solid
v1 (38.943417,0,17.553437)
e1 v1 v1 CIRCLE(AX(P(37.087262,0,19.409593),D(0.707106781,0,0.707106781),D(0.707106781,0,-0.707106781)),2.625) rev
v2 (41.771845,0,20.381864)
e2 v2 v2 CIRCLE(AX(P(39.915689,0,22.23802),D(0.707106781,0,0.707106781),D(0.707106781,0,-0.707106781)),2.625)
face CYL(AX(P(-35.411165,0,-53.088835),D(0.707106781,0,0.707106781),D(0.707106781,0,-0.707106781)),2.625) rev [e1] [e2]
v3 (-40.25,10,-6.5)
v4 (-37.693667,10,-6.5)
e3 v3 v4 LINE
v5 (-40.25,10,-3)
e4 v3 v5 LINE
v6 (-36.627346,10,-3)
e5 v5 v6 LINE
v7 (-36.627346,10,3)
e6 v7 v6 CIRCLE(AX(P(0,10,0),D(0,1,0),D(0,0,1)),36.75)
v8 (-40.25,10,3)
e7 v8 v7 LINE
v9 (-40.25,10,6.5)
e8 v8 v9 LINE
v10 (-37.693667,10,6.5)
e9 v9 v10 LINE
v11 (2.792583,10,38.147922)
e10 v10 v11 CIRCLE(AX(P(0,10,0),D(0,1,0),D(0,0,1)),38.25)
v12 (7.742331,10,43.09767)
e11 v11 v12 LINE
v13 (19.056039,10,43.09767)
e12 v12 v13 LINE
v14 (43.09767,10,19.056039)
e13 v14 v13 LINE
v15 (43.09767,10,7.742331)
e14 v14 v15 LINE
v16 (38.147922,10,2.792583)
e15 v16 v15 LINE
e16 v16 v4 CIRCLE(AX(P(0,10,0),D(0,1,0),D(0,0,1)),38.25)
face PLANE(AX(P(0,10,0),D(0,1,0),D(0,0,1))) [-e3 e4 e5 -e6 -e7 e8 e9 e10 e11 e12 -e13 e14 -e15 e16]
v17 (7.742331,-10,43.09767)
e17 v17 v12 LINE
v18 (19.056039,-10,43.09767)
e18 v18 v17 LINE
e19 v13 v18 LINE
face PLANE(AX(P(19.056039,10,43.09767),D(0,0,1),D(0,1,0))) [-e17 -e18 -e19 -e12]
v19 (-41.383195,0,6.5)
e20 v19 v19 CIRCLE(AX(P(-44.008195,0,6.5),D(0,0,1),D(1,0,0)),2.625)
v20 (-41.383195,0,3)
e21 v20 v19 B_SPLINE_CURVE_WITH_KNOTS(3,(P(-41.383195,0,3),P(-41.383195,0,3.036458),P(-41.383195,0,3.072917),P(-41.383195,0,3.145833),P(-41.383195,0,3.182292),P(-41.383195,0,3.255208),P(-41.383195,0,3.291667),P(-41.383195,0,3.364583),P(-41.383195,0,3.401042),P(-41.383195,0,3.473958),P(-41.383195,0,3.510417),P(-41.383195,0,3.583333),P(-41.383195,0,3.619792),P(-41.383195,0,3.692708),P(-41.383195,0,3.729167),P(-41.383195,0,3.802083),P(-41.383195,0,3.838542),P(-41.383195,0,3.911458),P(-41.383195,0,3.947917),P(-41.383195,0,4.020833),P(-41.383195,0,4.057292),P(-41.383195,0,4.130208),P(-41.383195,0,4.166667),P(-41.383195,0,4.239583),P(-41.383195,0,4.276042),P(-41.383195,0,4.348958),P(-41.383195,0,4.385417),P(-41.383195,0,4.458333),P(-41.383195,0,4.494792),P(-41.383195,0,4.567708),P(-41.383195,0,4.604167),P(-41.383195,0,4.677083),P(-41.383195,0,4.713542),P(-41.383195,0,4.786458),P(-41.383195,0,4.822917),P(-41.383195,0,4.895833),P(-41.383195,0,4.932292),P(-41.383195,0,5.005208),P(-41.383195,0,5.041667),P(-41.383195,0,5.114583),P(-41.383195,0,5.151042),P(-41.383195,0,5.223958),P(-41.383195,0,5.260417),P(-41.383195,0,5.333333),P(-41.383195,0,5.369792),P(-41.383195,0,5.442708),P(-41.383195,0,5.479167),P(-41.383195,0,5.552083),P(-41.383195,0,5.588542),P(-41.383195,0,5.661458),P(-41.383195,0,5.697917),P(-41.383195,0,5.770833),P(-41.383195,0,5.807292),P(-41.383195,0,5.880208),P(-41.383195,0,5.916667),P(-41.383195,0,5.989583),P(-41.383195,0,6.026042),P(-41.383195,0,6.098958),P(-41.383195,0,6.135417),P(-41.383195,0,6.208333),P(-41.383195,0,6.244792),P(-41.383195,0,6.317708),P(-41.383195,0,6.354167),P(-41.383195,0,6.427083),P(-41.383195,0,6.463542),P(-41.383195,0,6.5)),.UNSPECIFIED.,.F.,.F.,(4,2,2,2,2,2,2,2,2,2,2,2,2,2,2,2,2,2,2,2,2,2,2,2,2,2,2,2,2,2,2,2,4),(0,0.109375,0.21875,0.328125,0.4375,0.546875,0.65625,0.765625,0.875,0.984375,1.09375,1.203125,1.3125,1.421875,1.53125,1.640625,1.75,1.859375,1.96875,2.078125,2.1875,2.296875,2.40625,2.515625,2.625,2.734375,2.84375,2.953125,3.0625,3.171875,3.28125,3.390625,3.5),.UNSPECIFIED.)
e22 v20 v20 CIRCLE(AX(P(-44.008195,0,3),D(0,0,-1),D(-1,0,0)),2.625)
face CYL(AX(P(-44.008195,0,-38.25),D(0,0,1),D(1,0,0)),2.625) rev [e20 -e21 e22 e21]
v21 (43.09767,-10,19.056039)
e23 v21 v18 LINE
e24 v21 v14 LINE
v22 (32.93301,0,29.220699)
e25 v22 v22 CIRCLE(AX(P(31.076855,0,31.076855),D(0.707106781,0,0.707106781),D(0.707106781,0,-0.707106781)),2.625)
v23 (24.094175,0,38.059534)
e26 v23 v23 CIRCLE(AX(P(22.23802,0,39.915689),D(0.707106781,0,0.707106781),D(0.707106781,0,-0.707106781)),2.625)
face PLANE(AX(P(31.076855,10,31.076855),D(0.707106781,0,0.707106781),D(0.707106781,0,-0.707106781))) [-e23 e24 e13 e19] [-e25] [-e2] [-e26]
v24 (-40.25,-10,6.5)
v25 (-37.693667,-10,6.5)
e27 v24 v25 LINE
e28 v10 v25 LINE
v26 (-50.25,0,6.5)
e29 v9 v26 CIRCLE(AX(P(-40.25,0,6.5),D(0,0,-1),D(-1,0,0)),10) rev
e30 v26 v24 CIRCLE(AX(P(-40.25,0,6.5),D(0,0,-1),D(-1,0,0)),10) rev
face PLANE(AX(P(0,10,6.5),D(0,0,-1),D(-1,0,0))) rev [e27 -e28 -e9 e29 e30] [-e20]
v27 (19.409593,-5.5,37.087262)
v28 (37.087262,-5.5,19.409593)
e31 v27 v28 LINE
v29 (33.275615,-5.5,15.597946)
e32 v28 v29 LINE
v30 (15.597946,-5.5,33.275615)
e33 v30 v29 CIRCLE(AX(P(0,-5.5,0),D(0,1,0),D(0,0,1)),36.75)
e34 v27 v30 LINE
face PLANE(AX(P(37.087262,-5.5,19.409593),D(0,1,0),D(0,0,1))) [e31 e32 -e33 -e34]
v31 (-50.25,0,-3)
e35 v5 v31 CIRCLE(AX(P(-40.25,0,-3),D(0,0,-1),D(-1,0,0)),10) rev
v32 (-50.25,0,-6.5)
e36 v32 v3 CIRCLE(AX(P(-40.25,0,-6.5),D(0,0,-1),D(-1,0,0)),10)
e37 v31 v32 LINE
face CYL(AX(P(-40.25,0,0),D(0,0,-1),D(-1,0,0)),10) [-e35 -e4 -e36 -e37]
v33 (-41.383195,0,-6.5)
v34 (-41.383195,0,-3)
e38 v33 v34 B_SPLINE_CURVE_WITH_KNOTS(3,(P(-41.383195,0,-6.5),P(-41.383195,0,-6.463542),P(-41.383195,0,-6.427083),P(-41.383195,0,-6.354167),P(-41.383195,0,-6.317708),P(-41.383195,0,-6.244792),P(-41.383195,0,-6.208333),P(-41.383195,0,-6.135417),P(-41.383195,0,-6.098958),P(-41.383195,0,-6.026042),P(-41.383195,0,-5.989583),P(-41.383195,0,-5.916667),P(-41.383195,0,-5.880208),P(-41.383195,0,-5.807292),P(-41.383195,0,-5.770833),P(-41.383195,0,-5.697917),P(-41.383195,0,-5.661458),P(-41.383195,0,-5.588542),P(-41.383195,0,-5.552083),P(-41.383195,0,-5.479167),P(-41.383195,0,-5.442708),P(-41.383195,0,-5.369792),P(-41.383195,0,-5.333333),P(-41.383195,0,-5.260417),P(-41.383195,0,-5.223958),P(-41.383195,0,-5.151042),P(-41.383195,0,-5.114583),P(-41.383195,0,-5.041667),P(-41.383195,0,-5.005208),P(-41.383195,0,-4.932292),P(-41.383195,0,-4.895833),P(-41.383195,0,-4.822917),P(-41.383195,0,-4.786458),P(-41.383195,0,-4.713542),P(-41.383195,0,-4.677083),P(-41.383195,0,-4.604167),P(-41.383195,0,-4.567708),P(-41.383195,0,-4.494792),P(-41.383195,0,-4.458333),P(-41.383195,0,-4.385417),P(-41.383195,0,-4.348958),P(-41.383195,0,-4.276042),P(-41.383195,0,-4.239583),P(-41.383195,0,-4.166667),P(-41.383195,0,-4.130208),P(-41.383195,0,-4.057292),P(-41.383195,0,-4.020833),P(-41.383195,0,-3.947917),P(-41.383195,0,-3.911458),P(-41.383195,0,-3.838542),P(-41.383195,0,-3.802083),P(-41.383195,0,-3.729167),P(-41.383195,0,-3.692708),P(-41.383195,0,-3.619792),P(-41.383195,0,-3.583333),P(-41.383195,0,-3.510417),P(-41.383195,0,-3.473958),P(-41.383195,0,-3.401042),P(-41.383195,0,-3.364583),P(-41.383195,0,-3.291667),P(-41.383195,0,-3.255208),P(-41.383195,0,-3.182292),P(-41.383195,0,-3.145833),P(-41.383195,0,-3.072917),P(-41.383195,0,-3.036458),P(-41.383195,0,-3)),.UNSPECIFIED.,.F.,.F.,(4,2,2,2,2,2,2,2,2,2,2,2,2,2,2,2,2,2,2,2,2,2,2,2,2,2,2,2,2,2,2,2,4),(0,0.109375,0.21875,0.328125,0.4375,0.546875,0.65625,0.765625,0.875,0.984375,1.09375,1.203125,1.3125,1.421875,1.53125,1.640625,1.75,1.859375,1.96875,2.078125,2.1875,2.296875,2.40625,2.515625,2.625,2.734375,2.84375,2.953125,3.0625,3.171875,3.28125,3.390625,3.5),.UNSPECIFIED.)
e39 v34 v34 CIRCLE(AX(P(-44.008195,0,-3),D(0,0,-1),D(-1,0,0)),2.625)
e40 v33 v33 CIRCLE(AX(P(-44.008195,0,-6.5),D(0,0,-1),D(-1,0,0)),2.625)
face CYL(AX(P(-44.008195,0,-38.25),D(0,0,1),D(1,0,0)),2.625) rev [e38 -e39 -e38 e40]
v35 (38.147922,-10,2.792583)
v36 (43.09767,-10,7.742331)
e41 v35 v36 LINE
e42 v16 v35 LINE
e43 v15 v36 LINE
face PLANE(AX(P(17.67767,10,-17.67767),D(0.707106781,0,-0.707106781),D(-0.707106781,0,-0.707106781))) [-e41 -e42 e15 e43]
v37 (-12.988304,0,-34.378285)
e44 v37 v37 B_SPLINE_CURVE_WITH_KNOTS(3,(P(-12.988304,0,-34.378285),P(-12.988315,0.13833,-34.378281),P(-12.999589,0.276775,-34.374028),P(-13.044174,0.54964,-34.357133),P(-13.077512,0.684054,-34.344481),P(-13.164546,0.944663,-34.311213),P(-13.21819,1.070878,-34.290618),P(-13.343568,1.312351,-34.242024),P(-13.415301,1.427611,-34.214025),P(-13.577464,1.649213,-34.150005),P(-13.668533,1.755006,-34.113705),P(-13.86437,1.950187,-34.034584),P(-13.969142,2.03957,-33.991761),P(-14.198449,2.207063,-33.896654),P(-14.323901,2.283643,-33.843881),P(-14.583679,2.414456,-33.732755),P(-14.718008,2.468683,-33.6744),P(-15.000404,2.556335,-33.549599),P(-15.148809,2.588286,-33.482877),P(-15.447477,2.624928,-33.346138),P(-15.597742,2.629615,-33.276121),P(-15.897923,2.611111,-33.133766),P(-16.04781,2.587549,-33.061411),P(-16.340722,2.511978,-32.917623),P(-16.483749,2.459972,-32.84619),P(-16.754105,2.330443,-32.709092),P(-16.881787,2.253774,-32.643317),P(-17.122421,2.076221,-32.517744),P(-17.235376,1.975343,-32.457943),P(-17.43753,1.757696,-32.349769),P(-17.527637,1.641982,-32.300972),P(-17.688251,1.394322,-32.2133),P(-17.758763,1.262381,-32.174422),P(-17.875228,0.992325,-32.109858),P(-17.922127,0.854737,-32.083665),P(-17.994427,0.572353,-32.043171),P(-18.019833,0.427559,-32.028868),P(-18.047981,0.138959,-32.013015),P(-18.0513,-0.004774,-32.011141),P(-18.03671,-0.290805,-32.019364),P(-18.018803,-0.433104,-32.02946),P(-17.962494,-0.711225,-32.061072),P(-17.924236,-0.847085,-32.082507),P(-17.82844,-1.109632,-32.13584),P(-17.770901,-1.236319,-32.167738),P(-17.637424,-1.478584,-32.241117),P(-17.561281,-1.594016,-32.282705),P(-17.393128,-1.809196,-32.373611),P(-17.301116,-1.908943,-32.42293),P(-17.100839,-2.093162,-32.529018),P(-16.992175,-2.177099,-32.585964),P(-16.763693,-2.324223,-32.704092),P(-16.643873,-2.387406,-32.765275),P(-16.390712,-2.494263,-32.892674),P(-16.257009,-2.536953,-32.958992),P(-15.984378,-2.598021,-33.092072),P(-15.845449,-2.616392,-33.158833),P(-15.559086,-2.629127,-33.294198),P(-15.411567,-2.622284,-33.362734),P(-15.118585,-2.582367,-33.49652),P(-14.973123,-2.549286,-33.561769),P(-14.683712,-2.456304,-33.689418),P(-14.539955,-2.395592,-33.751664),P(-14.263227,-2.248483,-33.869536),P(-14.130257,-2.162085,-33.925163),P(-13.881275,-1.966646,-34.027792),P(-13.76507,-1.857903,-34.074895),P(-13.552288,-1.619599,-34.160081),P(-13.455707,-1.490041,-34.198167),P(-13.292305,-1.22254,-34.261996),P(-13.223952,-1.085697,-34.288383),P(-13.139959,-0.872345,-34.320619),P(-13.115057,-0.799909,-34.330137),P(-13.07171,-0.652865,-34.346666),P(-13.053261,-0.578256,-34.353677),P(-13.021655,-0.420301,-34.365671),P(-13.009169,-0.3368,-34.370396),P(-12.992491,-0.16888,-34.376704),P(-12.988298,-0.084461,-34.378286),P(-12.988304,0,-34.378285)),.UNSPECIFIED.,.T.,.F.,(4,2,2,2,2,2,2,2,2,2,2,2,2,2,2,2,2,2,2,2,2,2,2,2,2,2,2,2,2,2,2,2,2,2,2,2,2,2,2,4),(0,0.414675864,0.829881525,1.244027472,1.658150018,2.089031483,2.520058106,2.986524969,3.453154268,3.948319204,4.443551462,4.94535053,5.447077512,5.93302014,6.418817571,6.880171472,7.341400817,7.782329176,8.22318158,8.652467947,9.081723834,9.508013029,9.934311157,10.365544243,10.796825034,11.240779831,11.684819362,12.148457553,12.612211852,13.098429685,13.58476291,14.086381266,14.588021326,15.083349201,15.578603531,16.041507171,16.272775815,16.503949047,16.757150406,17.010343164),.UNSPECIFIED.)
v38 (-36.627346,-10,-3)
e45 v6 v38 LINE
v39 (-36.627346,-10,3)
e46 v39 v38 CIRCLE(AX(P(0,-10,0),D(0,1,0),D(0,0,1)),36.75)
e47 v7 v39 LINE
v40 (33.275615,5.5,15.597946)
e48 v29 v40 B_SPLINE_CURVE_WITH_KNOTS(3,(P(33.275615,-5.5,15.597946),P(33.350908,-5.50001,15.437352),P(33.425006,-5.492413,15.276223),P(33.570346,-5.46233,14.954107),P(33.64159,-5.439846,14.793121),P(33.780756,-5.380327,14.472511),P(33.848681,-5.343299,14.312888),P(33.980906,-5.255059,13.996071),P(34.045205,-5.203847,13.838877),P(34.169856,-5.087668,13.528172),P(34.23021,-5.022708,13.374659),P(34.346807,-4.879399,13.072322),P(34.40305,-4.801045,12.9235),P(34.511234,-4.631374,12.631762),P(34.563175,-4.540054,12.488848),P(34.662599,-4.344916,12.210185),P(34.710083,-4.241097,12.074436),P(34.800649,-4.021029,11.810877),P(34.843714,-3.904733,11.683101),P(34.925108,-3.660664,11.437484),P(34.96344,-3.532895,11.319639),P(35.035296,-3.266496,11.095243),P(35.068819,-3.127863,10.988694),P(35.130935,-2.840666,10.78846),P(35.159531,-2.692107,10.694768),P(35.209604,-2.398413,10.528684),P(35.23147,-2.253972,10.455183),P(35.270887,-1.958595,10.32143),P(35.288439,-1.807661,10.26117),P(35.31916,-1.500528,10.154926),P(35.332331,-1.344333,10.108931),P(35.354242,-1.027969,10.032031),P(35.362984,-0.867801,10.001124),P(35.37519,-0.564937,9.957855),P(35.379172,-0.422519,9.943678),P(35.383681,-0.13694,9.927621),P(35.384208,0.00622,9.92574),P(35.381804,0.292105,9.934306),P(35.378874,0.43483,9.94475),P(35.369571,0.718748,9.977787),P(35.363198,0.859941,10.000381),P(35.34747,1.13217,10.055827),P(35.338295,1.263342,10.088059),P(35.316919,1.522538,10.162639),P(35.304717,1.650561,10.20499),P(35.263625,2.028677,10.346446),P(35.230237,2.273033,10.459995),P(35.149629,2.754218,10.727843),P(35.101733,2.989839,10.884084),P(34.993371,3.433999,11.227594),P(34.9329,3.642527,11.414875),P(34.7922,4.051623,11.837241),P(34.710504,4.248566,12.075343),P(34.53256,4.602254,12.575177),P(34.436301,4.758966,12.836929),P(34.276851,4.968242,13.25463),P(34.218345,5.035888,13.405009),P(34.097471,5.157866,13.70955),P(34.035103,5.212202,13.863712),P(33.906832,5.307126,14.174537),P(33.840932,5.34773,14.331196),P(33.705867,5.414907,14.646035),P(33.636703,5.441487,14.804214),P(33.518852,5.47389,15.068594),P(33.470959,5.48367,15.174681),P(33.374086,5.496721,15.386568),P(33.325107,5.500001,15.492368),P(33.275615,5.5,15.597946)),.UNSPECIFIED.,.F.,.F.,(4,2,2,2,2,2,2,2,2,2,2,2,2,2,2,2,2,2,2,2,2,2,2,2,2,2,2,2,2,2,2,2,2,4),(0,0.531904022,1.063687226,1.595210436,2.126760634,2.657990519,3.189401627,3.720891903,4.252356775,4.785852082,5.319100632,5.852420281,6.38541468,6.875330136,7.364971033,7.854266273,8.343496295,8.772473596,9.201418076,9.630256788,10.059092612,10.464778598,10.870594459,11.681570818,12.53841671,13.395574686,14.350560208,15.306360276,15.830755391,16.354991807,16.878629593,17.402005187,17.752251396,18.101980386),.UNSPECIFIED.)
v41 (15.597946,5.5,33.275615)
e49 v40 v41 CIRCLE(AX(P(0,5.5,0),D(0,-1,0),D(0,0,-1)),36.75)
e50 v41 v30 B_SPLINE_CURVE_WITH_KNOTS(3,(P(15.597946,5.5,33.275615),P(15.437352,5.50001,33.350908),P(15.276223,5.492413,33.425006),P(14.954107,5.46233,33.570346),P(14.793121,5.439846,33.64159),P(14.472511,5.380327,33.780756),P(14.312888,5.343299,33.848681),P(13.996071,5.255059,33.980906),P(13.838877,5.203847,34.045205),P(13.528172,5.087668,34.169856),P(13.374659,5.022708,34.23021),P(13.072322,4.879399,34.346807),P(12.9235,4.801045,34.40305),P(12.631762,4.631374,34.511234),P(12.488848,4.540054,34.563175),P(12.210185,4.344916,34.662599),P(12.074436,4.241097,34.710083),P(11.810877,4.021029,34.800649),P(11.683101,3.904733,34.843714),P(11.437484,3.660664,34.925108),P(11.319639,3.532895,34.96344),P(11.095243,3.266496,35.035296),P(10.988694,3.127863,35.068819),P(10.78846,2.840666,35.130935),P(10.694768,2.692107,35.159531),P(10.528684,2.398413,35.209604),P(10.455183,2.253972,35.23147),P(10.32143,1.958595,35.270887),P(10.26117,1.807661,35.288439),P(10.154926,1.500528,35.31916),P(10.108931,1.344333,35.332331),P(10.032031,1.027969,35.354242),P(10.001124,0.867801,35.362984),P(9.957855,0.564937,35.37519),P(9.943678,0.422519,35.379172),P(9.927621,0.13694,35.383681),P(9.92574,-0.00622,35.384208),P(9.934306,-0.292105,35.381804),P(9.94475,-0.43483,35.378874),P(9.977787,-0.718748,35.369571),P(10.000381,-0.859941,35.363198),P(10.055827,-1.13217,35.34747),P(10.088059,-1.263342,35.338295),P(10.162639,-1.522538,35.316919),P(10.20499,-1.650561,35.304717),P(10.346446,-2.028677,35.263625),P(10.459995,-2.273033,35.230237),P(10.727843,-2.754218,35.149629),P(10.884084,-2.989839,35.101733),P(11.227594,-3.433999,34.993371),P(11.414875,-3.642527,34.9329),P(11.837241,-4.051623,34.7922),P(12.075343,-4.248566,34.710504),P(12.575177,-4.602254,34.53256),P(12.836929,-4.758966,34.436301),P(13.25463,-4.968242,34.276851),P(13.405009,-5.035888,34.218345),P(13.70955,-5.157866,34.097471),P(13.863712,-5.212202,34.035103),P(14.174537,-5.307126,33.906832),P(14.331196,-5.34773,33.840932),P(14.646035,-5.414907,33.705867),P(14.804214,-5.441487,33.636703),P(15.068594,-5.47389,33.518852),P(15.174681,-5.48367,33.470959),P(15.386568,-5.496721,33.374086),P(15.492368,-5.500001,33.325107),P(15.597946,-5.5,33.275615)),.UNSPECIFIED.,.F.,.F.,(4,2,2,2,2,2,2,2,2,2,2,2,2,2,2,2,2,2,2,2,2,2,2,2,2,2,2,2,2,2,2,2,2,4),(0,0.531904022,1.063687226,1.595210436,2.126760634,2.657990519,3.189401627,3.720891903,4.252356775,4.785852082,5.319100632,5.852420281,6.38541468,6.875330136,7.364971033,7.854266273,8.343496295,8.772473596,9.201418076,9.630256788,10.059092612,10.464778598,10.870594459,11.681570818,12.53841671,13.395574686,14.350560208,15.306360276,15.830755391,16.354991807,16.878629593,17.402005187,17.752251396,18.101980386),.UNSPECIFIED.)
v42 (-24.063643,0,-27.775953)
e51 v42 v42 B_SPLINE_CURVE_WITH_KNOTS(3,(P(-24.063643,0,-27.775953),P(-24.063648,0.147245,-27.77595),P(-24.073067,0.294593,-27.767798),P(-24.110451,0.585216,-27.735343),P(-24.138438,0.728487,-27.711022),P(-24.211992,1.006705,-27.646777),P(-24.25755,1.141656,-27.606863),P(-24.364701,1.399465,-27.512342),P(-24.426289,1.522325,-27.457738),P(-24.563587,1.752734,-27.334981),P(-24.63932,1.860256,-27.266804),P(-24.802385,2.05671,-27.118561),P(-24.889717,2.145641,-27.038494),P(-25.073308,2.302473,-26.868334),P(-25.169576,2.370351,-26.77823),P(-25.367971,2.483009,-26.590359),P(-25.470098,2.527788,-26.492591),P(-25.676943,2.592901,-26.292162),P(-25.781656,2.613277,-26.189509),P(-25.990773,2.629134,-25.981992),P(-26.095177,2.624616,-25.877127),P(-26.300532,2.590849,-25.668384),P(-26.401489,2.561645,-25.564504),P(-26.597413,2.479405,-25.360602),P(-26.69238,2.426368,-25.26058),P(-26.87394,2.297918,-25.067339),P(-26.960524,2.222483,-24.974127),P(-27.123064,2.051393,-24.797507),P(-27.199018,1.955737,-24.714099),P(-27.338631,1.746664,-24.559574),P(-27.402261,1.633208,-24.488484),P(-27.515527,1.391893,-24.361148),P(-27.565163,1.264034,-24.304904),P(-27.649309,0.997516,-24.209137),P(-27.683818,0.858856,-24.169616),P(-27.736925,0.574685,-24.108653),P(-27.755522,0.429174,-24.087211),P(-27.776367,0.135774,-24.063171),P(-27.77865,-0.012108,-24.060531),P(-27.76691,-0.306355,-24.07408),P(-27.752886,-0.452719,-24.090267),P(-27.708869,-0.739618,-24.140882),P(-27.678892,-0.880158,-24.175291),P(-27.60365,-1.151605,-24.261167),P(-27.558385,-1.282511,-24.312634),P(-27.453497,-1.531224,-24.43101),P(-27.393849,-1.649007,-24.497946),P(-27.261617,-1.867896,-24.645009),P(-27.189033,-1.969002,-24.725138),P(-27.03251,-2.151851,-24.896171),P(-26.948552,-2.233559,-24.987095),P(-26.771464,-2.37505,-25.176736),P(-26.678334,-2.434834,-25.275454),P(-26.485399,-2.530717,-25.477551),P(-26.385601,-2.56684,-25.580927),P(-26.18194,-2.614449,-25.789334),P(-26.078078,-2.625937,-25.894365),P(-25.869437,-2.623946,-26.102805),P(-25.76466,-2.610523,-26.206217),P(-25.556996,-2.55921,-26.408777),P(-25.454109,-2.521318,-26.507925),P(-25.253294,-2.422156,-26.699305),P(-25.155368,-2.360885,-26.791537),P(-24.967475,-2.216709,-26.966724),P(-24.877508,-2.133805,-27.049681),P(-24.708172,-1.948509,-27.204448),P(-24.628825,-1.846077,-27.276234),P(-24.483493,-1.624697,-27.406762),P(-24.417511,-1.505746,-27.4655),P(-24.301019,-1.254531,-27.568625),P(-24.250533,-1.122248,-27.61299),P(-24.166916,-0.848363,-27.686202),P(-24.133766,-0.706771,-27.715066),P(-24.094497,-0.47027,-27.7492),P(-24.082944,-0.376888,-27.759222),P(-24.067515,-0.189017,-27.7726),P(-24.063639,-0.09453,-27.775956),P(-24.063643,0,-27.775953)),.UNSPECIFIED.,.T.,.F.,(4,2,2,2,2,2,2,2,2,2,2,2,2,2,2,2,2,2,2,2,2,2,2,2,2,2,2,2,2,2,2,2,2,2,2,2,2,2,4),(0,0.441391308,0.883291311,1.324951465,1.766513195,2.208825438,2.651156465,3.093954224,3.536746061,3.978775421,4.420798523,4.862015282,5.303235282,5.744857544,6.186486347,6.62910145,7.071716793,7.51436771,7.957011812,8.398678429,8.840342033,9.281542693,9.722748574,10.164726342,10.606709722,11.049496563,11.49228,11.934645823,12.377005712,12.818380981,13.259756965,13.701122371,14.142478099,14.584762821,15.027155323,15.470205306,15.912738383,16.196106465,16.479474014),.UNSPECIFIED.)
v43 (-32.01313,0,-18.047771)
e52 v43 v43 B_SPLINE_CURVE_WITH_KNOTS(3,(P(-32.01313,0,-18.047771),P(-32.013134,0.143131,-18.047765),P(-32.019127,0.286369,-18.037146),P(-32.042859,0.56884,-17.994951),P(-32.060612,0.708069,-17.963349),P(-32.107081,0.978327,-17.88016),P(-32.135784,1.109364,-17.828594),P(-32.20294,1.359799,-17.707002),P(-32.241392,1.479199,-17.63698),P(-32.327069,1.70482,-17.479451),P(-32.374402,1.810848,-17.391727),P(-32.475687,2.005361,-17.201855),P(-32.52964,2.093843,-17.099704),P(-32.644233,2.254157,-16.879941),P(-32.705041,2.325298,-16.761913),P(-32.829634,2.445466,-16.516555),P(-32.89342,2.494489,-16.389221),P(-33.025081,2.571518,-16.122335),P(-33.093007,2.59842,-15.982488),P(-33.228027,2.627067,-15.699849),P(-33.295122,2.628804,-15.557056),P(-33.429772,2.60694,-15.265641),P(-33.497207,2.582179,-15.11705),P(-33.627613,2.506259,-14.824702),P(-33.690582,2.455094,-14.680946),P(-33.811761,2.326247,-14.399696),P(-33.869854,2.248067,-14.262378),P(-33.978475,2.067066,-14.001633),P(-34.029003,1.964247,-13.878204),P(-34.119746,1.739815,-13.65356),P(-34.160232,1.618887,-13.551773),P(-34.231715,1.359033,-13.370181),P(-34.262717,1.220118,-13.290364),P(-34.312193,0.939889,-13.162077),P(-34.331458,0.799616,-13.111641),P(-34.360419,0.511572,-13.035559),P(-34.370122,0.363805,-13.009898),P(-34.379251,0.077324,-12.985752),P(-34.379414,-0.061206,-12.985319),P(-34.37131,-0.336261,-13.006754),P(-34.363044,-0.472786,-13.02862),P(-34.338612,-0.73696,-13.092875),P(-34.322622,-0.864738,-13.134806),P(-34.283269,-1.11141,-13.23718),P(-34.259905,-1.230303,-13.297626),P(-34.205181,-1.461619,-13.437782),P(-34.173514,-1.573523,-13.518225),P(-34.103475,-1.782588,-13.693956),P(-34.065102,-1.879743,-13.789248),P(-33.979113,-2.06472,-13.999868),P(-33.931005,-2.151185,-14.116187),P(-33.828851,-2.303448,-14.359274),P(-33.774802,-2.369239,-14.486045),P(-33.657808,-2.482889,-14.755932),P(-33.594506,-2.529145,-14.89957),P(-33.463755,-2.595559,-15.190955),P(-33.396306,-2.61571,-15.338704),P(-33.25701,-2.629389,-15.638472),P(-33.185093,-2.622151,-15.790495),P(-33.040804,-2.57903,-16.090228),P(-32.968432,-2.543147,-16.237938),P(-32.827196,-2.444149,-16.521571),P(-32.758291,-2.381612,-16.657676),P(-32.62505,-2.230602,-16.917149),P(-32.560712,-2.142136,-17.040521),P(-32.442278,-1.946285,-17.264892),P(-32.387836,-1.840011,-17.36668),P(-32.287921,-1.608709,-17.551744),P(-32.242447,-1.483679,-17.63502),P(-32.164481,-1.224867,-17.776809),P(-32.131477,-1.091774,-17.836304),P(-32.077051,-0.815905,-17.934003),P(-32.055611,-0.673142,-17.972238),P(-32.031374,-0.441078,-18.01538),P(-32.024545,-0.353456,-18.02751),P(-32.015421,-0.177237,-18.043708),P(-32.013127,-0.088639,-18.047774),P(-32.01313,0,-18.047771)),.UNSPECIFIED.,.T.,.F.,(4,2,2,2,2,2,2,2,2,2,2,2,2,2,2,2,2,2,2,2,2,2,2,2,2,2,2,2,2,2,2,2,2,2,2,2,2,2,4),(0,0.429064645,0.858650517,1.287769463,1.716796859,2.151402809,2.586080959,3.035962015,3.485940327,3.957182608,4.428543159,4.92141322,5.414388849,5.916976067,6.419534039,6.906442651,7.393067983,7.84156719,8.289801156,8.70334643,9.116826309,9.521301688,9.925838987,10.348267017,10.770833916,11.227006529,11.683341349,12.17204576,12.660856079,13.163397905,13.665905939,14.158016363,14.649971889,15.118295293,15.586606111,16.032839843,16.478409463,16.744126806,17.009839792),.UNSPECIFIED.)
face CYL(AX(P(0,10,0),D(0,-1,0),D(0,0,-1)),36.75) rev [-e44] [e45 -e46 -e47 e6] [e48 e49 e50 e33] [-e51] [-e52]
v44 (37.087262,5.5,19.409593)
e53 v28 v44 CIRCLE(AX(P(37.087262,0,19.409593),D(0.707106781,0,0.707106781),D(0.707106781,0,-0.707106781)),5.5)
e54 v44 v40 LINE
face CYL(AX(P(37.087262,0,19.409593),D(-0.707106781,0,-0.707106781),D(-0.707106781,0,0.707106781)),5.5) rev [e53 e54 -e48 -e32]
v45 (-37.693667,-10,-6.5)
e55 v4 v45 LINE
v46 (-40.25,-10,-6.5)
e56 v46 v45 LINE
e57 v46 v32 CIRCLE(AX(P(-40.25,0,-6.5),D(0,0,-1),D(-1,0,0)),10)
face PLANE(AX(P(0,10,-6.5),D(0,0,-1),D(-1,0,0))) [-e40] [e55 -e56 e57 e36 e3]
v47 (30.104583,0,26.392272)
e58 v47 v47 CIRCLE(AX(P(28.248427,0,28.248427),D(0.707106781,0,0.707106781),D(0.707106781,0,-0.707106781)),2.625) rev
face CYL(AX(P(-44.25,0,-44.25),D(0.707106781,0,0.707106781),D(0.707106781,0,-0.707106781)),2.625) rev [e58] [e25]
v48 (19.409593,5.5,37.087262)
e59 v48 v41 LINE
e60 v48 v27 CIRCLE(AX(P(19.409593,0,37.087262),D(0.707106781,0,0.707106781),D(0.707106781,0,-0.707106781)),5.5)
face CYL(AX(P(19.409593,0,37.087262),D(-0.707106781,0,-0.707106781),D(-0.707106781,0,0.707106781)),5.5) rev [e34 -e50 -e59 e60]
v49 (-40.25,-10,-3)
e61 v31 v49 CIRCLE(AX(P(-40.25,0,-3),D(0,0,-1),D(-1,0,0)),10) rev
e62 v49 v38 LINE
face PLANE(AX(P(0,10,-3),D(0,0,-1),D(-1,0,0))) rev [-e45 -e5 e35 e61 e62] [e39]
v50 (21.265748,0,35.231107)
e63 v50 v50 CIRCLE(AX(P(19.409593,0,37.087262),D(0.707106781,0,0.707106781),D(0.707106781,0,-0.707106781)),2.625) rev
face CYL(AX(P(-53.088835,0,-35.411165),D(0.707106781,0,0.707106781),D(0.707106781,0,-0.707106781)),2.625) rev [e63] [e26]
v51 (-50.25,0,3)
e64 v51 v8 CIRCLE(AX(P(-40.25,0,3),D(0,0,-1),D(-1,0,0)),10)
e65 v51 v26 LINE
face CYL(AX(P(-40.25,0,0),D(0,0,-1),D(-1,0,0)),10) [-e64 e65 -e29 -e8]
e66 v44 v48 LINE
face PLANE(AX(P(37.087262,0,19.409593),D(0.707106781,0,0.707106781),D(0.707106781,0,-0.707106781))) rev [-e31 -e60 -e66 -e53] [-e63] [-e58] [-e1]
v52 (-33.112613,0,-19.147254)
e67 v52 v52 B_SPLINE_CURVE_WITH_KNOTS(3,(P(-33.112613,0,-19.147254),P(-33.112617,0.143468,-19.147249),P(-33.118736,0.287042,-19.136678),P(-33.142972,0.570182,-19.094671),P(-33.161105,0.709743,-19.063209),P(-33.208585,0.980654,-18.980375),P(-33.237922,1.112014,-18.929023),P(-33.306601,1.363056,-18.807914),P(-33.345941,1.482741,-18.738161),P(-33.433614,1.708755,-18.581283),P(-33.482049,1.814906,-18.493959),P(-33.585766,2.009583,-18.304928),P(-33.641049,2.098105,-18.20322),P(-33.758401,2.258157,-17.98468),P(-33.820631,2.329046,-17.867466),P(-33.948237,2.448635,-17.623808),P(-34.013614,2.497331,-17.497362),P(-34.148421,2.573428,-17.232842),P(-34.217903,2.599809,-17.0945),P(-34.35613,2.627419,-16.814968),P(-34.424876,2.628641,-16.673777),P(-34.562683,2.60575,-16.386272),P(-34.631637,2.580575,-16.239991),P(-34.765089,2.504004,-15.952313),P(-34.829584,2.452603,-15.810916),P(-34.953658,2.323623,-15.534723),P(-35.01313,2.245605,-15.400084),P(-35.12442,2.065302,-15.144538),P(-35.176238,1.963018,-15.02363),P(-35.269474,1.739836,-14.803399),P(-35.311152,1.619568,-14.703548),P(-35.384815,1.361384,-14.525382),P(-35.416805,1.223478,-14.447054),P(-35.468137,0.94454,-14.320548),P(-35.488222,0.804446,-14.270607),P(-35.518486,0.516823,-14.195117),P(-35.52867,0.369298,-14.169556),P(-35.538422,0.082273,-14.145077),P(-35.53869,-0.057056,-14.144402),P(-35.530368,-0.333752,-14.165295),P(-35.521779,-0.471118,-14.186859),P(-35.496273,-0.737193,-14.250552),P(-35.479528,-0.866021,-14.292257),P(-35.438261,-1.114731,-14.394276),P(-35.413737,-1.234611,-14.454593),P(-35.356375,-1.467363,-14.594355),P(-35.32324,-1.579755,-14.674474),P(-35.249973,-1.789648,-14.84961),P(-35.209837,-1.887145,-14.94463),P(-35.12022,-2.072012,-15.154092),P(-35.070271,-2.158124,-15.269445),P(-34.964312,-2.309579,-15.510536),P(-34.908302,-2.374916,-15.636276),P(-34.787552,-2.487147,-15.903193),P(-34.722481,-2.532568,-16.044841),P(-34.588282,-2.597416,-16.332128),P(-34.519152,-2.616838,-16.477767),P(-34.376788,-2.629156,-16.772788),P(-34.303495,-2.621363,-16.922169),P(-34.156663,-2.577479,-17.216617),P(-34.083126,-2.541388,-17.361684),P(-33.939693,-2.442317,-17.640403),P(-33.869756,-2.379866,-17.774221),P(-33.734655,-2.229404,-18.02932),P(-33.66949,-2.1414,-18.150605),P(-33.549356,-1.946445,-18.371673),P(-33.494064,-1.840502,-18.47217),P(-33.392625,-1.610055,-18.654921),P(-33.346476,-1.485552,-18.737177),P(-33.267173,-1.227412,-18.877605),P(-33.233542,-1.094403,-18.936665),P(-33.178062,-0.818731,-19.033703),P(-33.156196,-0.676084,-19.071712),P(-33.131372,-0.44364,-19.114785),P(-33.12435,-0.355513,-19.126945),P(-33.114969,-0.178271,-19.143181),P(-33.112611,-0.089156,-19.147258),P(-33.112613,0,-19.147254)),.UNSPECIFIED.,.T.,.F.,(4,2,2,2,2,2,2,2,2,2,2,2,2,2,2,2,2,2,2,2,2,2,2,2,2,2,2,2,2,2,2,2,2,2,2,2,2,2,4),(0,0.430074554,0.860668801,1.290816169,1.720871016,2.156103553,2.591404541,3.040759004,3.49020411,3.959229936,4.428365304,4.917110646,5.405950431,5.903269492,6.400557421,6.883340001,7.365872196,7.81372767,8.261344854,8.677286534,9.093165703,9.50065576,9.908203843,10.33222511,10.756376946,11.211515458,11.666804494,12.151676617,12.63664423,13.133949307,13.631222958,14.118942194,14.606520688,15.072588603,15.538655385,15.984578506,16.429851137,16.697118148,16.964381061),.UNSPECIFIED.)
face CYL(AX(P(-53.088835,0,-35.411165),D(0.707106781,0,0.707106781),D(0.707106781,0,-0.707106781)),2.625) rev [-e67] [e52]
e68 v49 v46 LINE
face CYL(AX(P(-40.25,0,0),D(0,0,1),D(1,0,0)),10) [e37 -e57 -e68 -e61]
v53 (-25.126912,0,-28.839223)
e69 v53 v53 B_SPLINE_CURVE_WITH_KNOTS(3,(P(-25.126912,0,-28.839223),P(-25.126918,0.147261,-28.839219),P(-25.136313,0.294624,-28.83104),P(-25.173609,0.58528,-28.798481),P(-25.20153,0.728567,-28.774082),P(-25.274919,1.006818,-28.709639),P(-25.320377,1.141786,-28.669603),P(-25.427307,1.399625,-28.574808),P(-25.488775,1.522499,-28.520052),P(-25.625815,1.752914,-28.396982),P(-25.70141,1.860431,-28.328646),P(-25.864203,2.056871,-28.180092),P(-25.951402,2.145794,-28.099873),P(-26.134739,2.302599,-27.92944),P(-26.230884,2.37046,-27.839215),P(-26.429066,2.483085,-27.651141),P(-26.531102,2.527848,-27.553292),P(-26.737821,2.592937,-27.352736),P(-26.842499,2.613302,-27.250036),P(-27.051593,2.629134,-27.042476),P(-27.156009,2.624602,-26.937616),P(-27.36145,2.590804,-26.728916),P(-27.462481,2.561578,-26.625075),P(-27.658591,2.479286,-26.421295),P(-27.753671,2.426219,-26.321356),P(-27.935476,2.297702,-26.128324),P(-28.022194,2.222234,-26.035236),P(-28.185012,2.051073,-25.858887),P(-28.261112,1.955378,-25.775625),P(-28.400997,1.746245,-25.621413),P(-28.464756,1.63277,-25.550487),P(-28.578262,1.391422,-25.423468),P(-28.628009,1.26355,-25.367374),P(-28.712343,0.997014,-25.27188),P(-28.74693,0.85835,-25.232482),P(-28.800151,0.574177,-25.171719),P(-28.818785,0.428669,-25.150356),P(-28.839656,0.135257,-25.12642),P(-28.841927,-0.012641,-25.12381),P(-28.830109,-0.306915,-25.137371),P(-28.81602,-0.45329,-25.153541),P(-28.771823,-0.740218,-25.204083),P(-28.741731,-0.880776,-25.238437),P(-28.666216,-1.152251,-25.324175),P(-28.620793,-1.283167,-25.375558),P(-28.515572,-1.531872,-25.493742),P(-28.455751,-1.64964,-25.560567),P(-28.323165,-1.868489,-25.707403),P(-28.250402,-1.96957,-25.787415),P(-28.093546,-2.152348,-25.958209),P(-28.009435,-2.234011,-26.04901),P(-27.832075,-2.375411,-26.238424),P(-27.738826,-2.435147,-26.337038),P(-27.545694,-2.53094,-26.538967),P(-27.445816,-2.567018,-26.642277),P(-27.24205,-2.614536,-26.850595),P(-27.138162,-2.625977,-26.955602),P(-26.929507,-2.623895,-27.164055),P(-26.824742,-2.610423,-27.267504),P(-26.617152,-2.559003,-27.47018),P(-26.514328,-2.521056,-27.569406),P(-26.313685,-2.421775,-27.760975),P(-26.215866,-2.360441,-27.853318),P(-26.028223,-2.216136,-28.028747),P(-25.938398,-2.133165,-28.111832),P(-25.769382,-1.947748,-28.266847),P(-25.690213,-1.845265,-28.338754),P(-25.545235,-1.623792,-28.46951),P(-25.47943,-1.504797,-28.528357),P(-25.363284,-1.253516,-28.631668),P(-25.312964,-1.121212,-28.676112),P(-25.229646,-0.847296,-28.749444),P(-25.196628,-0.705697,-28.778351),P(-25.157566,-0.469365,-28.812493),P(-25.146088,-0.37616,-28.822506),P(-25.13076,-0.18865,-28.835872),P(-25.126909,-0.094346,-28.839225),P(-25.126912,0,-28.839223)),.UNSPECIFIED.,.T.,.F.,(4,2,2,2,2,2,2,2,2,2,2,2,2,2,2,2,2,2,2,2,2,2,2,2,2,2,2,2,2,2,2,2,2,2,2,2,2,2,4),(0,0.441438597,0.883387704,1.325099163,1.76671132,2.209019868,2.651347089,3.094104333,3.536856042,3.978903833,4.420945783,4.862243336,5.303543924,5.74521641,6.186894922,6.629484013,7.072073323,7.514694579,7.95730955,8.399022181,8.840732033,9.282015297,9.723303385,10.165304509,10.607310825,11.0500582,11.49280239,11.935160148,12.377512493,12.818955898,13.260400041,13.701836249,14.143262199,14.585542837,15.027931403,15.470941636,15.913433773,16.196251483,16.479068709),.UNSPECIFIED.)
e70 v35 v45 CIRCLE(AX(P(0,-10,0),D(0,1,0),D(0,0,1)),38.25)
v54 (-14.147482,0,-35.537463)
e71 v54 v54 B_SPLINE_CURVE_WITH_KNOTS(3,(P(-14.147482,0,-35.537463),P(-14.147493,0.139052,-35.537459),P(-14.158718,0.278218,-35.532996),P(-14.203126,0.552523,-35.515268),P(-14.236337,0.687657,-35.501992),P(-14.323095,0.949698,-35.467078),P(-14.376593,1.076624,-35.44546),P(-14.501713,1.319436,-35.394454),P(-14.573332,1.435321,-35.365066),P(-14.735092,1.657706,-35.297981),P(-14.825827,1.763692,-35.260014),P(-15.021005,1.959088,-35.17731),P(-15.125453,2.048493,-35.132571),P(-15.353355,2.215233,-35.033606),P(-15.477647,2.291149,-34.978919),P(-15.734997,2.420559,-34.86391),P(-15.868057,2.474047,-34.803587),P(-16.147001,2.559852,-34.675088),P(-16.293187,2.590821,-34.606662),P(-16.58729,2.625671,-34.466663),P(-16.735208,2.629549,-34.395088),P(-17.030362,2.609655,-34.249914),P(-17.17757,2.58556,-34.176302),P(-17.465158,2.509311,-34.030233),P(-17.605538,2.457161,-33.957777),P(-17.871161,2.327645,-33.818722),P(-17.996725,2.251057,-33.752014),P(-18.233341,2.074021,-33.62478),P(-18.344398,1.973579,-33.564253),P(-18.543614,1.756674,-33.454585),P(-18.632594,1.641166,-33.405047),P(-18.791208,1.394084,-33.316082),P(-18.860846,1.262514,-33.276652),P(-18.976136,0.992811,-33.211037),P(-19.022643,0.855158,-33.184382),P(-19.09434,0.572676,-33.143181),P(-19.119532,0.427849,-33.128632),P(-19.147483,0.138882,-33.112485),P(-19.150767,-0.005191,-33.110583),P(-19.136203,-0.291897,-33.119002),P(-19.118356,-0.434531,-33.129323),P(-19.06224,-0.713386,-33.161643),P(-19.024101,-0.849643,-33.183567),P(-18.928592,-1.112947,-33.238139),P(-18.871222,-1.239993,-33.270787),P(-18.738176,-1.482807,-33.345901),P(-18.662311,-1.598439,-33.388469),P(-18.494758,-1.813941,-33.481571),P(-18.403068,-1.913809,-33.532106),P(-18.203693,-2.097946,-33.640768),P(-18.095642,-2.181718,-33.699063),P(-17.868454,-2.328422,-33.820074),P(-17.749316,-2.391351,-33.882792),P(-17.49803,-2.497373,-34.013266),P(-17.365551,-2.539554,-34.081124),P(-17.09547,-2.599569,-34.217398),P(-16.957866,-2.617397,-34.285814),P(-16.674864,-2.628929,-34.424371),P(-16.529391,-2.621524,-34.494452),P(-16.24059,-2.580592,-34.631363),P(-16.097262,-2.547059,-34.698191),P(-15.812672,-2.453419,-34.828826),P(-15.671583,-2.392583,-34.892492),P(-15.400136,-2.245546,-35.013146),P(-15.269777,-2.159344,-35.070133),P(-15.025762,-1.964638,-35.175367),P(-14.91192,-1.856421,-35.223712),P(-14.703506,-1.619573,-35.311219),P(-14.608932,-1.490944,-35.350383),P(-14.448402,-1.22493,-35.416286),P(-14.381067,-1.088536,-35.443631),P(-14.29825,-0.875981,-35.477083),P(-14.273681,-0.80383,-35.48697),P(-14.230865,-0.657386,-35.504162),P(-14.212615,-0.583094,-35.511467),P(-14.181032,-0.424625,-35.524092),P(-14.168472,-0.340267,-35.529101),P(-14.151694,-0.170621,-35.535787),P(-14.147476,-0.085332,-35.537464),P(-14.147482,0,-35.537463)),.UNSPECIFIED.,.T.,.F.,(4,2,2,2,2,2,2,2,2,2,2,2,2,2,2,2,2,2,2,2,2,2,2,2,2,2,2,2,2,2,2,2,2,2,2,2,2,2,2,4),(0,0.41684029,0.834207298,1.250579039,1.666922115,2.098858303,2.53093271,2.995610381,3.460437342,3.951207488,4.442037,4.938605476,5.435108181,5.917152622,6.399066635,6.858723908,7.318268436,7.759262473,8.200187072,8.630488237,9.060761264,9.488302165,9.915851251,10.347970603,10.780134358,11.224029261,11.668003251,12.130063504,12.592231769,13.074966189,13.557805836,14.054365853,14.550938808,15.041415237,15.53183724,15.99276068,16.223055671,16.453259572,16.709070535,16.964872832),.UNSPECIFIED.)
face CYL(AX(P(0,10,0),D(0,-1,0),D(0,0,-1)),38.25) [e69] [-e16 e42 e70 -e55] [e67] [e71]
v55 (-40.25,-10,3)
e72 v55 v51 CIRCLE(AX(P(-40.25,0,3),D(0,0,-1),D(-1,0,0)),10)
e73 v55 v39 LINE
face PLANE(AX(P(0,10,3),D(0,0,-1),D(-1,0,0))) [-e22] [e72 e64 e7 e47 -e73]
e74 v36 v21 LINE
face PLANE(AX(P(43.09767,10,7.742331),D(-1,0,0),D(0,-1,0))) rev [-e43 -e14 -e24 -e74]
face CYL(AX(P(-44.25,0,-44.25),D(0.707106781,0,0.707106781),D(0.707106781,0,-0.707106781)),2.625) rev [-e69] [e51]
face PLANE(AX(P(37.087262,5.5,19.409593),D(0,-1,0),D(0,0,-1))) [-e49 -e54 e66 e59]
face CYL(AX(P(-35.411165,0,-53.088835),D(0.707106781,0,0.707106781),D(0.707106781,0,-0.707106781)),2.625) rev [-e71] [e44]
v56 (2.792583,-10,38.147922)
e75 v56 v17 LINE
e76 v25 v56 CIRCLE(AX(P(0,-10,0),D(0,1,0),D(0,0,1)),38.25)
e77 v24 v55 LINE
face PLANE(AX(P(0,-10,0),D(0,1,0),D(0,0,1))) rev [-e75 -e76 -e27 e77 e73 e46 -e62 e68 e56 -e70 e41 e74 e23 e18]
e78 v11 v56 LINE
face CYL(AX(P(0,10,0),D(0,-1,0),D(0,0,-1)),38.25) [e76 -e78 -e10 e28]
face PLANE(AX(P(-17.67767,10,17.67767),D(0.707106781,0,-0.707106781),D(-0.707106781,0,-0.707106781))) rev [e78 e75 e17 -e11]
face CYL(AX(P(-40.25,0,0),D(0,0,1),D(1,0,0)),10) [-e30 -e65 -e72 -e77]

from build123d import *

# Parameters (mm, degrees)
BOSS_EXTRUDE1_DEPTH = 10
SKETCH2_R           = 2.625
CUT_EXTRUDE1_DEPTH  = 69.02664919
SKETCH3_R           = 2.625
CUT_EXTRUDE2_DEPTH  = 108.332520819
CUT_EXTRUDE3_DEPTH  = 11
FILLET1_R           = 10
CHAMFER1_SIZE       = 8


with BuildPart() as part:
    # Sketch1 → Boss-Extrude1 (new, symmetric)
    with BuildSketch(Plane(origin=(0, 0, 0), x_dir=(1, 0, 0), z_dir=(0, 1, 0))):
        with BuildLine():
            Line((-37.693666577, 6.5), (-50.25, 6.5))
            Line((-50.25, 6.5), (-50.25, 3))
            Line((-50.25, 3), (-36.627346341, 3))
            ThreePointArc((-36.627346341, 3), (3.731967617, 36.560018021), (36.478063401, -4.462442214))
            Line((36.478063401, -4.462442214), (38.147922337, -2.792583278))
            ThreePointArc((38.147922337, -2.792583278), (4.651839751, 37.966075474), (-37.693666577, 6.5))
        make_face()
        with BuildLine():
            Line((48.754524055, -13.399184996), (38.147922337, -2.792583278))
            ThreePointArc((38.147922337, -2.792583278), (27.04683438, -27.04683438), (2.792583278, -38.147922337))
            Line((2.792583278, -38.147922337), (13.399184996, -48.754524055))
            Line((13.399184996, -48.754524055), (48.754524055, -13.399184996))
        make_face()
        with BuildLine():
            ThreePointArc((-37.693666577, -6.5), (-23.55672199, -30.135416856), (2.792583278, -38.147922337))
            Line((2.792583278, -38.147922337), (4.462442214, -36.478063401))
            ThreePointArc((4.462442214, -36.478063401), (-23.212937054, -28.490736272), (-36.627346341, -3))
            Line((-36.627346341, -3), (-50.25, -3))
            Line((-50.25, -3), (-50.25, -6.5))
            Line((-50.25, -6.5), (-37.693666577, -6.5))
        make_face()
        with BuildLine():
            ThreePointArc((2.792583278, -38.147922337), (27.04683438, -27.04683438), (38.147922337, -2.792583278))
            Line((38.147922337, -2.792583278), (36.478063401, -4.462442214))
            ThreePointArc((36.478063401, -4.462442214), (25.986174209, -25.986174209), (4.462442214, -36.478063401))
            Line((4.462442214, -36.478063401), (2.792583278, -38.147922337))
        make_face()
    extrude(amount=BOSS_EXTRUDE1_DEPTH, both=True)

    # Sketch2 → Cut-Extrude1 (cut, through all)
    with BuildSketch(Plane.XY.offset(6.5)):
        with Locations((-44.008194531, 0)):
            Circle(SKETCH2_R)
    extrude(amount=-CUT_EXTRUDE1_DEPTH, mode=Mode.SUBTRACT)

    # Sketch3 → Cut-Extrude2 (cut, through all)
    with BuildSketch(Plane(origin=(31.076854525, 0, 31.076854525), x_dir=(0.7071067811865457, 0, -0.7071067811865496), z_dir=(0.7071067811865496, 0, 0.7071067811865457))):
        Circle(SKETCH3_R)
        with Locations((-12.5, 0)):
            Circle(SKETCH3_R)
        with Locations((12.5, 0)):
            Circle(SKETCH3_R)
    extrude(amount=-CUT_EXTRUDE2_DEPTH, mode=Mode.SUBTRACT)

    # Sketch6 → Cut-Extrude3 (cut)
    with BuildSketch(Plane(origin=(20.470252807, 0, 20.470252807), x_dir=(0.7071067811865457, 0, -0.7071067811865495), z_dir=(0.7071067811865495, 0, 0.7071067811865457))):
        with BuildLine():
            Line((12.5, -5.5), (-12.5, -5.5))
            ThreePointArc((-12.5, -5.5), (-18, 0), (-12.5, 5.5))
            Line((-12.5, 5.5), (12.5, 5.5))
            ThreePointArc((12.5, 5.5), (18, 0), (12.5, -5.5))
        make_face()
    extrude(amount=CUT_EXTRUDE3_DEPTH, mode=Mode.SUBTRACT)

    # Fillet1
    fillet1_edges = [part.edges().sort_by_distance(p)[0] for p in [
        (-50.25, -10, 4.75),
        (-50.25, 10, 4.75),
        (-50.25, -10, -4.75),
        (-50.25, 10, -4.75),
    ]]
    fillet(fillet1_edges, radius=FILLET1_R - 0.0001)  # a hair under: the kernel refuses the full size

    # Chamfer1
    chamfer1_edges = [part.edges().sort_by_distance(p)[0] for p in [
        (48.754524055, 0, 13.399184996),
        (13.399184996, 0, 48.754524055),
    ]]
    chamfer(chamfer1_edges, length=CHAMFER1_SIZE)


solid = part.part
